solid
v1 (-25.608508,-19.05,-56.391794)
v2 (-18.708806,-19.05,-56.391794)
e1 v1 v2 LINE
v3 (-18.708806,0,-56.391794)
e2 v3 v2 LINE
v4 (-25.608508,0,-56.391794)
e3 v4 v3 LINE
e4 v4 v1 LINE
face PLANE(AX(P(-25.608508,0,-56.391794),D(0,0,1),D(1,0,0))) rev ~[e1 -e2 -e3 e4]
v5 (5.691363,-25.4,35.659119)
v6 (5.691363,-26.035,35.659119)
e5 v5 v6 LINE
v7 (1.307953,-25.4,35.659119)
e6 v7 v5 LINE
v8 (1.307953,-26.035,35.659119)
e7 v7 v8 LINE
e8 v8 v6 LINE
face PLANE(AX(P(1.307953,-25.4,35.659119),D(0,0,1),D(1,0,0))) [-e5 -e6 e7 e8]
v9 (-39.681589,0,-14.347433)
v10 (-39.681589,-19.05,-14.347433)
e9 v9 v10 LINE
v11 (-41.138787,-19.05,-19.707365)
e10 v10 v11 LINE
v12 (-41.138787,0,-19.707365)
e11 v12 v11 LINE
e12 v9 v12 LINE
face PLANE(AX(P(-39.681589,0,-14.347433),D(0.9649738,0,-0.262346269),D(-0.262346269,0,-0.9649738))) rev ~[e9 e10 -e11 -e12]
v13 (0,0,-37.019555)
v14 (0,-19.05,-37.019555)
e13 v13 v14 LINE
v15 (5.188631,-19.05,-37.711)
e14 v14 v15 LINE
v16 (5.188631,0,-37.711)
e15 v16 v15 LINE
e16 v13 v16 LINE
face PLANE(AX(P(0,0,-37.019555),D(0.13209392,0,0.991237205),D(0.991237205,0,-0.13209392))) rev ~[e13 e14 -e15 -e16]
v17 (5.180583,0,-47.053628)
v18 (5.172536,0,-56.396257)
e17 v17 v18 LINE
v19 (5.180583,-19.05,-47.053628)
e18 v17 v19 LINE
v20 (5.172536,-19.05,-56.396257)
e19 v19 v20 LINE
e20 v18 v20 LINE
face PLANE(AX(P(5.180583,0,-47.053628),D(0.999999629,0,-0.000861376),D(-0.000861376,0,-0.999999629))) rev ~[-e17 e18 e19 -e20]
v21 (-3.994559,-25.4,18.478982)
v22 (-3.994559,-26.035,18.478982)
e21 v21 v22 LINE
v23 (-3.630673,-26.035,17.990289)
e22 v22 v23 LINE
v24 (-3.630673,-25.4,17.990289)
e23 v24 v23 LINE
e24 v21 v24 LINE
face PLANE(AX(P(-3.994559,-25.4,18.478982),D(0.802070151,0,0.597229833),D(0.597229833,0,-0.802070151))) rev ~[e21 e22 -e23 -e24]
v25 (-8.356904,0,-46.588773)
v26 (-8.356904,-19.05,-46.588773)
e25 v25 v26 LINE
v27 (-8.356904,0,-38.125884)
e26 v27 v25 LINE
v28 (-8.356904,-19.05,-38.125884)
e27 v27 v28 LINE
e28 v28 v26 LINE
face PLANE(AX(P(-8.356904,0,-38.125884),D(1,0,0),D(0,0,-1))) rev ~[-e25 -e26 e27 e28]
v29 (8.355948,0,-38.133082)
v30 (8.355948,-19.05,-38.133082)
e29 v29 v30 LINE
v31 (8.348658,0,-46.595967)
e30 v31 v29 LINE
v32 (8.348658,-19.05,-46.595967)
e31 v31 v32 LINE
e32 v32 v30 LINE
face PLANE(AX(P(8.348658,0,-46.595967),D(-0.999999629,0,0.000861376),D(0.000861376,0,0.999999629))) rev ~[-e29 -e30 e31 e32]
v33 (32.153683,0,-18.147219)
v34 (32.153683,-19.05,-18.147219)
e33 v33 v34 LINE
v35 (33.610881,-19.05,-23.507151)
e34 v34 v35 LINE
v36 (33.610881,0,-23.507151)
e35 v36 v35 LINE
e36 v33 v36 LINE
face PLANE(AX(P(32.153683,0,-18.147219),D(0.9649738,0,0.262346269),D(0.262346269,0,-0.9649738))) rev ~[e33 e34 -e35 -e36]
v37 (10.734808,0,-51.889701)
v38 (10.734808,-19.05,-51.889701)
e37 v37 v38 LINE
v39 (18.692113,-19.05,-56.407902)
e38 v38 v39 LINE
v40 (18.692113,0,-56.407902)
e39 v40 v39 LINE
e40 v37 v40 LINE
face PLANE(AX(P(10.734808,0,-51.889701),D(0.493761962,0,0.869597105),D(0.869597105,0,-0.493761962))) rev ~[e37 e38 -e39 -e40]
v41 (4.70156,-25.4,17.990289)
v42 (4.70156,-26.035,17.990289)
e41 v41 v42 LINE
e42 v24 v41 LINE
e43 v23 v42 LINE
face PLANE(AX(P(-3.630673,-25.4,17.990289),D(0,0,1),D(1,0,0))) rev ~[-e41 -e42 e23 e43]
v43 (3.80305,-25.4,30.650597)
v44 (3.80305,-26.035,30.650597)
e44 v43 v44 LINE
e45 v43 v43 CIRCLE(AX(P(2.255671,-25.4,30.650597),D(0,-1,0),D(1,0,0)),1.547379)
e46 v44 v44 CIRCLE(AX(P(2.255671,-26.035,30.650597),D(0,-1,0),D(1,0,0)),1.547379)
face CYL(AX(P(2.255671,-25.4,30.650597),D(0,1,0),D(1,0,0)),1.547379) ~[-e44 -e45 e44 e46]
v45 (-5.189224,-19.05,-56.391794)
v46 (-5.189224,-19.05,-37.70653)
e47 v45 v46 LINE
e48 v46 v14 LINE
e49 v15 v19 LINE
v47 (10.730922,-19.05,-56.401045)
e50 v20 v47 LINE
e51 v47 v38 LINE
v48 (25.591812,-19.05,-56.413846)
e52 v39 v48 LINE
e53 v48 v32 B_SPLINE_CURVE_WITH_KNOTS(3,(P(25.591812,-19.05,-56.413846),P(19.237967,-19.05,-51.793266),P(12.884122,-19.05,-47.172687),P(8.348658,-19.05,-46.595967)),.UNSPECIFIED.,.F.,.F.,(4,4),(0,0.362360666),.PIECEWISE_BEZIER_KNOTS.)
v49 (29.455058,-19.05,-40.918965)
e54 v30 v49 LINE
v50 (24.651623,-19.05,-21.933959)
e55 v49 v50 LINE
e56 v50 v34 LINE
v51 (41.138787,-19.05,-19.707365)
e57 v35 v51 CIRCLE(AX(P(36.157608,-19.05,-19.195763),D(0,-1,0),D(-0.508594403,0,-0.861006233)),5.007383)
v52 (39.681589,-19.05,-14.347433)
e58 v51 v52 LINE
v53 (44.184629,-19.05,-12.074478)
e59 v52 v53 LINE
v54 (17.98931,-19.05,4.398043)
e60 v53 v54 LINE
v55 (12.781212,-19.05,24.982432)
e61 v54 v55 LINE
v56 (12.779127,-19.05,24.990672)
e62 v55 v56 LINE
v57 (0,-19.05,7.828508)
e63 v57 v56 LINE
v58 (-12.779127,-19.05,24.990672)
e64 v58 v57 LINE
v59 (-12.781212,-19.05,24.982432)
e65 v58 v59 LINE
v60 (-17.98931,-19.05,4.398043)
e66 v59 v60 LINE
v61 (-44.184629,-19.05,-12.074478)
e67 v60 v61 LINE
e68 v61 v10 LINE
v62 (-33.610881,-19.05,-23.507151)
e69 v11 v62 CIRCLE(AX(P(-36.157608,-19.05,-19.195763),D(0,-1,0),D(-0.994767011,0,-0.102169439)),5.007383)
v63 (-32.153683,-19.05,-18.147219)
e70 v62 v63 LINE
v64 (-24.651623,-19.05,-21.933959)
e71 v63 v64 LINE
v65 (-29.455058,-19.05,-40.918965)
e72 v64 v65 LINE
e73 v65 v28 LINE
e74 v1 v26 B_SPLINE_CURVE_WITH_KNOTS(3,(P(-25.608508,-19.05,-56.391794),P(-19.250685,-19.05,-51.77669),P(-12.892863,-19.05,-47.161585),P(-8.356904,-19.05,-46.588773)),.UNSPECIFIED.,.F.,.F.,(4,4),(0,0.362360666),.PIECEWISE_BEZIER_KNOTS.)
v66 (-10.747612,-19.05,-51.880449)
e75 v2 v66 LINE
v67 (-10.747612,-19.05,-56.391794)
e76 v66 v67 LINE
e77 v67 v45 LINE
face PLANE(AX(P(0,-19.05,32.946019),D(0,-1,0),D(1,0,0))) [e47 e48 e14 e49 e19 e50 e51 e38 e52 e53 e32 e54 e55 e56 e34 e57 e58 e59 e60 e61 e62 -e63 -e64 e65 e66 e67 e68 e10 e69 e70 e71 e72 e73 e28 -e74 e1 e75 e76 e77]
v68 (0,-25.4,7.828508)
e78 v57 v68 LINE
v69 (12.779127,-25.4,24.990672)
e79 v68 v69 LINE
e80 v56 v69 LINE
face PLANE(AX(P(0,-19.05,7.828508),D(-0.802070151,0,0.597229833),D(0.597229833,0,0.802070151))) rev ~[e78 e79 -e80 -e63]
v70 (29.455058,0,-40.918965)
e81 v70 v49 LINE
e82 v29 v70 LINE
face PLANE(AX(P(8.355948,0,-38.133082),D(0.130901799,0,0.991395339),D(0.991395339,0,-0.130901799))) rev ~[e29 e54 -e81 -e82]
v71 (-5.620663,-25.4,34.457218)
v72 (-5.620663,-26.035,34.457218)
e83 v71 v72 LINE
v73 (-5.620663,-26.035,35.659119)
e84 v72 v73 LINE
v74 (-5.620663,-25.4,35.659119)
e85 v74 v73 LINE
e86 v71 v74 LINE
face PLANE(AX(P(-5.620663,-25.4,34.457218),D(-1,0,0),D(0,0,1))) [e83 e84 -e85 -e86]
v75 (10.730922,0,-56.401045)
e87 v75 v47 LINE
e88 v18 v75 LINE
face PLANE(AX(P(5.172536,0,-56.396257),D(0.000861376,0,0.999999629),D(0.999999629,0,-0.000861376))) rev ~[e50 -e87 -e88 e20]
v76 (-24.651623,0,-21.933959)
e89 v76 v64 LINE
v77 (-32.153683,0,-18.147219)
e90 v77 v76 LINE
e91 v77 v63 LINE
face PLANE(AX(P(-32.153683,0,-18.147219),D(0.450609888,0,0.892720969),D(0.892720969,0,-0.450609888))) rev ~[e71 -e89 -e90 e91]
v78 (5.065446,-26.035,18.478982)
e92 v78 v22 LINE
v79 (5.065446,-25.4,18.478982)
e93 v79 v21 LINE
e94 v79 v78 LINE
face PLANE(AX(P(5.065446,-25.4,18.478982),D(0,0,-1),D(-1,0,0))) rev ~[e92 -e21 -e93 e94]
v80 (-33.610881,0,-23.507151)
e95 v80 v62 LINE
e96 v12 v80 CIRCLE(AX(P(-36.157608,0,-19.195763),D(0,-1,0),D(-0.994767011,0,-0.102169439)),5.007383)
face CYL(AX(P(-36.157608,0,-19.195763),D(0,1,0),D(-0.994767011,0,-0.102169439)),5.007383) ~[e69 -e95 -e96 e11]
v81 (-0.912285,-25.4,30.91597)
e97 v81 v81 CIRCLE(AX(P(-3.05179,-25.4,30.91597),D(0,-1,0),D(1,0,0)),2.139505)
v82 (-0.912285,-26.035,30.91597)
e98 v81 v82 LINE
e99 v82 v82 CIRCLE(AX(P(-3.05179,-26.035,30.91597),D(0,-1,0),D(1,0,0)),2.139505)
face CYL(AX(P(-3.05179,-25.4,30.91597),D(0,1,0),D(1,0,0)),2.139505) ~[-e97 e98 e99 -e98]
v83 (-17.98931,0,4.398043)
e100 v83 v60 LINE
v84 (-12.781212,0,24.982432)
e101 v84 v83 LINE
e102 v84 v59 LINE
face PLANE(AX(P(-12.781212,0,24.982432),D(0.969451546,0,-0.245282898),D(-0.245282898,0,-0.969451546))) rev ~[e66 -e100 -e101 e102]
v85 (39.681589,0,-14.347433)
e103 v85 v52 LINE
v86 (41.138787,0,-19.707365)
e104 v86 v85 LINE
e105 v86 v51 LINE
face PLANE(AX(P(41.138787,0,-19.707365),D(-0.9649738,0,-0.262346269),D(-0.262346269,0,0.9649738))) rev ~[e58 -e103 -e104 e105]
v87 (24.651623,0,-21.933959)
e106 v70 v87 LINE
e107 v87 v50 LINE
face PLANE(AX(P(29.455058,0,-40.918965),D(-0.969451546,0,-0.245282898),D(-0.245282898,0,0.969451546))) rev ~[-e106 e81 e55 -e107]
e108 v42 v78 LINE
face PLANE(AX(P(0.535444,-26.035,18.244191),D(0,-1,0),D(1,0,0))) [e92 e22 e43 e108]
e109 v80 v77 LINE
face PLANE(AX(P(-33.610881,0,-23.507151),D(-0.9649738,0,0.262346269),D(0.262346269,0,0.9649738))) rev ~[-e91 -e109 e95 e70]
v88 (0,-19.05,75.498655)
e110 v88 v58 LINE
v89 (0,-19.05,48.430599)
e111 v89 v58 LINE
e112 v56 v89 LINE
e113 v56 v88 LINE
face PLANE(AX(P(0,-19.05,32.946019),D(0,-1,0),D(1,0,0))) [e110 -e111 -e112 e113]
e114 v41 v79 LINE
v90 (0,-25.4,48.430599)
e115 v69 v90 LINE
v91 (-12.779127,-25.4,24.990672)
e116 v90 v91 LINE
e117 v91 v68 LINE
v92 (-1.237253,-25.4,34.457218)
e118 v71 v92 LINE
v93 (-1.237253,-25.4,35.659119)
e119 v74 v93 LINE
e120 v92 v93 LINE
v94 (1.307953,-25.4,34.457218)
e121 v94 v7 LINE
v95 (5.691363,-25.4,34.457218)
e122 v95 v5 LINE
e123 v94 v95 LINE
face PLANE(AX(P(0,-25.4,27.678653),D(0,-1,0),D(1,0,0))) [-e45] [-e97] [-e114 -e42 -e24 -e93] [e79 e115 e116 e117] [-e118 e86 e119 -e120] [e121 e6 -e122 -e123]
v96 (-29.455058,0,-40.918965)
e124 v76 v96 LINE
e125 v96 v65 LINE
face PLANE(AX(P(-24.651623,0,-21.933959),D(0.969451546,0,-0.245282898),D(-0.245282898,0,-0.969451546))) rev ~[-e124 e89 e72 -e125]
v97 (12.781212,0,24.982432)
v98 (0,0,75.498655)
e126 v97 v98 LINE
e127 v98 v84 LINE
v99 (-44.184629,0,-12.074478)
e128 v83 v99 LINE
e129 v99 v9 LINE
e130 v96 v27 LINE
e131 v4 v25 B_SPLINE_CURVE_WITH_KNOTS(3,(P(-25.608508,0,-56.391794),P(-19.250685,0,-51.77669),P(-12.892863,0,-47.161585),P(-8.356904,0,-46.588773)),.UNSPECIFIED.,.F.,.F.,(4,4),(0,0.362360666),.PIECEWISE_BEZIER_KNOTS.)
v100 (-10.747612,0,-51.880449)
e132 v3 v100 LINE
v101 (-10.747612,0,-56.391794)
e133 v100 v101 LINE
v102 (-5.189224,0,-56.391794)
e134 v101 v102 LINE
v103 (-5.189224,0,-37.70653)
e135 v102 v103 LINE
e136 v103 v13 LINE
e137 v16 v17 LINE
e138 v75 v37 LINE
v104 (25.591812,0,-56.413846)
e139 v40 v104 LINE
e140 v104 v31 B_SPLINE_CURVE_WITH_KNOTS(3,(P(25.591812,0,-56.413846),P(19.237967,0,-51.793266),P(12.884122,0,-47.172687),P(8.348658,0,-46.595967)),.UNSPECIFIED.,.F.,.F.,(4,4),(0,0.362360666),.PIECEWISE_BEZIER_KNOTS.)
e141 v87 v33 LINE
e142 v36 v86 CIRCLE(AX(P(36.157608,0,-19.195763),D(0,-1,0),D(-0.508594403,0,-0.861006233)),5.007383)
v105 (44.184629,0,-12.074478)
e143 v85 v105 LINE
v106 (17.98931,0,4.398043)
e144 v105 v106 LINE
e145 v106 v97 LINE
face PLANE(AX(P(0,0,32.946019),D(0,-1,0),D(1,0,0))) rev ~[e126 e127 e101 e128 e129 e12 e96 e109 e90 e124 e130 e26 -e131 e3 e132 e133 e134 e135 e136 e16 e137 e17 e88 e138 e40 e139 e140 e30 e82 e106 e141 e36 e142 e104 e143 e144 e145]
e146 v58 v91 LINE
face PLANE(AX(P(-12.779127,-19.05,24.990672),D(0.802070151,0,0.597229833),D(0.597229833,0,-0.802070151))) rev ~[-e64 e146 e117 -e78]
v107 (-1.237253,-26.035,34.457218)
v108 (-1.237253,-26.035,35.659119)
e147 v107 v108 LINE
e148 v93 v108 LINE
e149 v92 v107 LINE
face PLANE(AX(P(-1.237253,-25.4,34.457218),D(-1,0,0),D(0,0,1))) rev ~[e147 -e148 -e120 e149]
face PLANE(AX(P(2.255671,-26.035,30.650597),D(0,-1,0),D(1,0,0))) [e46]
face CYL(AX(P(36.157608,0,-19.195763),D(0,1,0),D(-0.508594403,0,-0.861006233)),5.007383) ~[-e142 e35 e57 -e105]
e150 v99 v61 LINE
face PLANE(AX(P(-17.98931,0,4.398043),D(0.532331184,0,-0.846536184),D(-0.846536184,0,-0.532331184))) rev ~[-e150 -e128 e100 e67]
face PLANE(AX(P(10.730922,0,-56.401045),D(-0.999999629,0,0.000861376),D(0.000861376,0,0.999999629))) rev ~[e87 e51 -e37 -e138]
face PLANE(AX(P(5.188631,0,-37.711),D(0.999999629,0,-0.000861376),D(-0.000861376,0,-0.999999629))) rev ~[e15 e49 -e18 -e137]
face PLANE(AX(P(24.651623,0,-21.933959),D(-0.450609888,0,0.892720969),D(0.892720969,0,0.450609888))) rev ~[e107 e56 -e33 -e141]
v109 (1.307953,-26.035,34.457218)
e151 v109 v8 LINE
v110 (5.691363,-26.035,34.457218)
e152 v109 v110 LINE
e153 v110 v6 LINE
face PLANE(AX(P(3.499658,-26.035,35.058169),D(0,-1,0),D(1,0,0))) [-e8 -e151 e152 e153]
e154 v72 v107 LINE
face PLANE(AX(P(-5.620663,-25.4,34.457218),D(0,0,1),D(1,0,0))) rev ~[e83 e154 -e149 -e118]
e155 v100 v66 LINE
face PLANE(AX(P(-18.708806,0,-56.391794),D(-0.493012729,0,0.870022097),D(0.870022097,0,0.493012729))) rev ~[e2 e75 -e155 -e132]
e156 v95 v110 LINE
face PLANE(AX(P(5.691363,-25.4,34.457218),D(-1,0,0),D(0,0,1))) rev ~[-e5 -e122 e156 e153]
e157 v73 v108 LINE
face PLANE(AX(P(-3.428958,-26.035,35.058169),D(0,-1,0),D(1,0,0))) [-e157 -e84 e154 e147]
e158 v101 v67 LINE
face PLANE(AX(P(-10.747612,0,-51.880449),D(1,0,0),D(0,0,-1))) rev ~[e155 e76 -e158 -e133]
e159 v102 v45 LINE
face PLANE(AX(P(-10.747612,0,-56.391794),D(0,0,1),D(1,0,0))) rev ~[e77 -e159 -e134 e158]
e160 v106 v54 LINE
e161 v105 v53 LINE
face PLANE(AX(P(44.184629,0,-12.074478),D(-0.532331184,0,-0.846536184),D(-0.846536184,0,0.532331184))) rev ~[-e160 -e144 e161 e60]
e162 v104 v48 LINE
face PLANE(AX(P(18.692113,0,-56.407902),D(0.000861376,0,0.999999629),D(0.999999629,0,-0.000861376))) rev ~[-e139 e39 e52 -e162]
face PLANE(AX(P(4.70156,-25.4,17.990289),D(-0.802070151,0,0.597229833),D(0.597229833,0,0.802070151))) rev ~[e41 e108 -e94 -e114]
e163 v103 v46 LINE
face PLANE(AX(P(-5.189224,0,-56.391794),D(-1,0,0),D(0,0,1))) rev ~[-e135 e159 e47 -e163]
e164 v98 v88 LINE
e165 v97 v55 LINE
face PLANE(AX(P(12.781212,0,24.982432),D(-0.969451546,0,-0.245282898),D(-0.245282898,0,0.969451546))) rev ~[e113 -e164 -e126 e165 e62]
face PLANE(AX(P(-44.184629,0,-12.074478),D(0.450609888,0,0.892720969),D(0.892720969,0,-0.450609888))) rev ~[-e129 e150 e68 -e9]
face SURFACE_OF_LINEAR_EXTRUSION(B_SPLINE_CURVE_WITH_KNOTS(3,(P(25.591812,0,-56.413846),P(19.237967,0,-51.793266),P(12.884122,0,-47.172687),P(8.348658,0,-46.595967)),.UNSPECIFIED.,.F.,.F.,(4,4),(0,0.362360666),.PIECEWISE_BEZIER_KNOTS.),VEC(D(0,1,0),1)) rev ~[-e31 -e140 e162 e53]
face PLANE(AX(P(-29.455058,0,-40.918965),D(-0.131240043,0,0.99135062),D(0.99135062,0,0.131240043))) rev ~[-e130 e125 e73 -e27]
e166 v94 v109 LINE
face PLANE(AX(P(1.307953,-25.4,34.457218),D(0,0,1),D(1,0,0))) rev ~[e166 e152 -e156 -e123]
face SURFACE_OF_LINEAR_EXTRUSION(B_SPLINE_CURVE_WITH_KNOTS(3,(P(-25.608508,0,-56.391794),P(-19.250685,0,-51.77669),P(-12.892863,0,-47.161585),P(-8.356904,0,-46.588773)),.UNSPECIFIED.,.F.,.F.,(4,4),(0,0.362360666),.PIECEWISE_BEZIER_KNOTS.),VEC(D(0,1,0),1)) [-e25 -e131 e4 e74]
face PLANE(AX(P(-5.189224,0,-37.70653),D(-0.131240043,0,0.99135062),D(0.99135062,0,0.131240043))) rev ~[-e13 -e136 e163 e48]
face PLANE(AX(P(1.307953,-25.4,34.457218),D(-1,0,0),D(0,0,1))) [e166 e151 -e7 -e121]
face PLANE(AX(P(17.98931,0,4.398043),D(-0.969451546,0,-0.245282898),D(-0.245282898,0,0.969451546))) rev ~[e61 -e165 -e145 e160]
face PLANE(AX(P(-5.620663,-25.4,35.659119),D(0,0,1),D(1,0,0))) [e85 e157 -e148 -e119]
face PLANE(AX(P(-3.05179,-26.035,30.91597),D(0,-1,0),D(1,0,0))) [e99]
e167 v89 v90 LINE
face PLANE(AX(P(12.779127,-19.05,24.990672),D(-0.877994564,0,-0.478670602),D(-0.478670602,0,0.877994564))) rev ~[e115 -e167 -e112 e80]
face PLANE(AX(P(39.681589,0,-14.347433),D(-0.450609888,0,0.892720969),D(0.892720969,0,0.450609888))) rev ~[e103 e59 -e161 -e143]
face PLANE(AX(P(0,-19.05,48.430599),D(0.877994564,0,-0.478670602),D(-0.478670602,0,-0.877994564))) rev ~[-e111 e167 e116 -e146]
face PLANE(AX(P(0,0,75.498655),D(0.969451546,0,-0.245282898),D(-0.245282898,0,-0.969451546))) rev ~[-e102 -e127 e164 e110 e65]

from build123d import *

# Parameters (mm, degrees)
F1_DEPTH = 19.05
F3_DEPTH = 6.35
F4_R     = 2.1395052033
F4_R_2   = 1.5473789097
F4_W     = 4.3834099779
F4_H     = 1.2019015849
F5_DEPTH = 0.635


with BuildPart() as f1:
    # F0 (on Front) → F1 (new body)
    with BuildSketch(Plane.XZ):
        Polygon((12.7812118899, 24.9824322697), (0, 75.4986554384), (-12.7812118899, 24.9824322697), (-17.9893098468, 4.3980431727), (17.9893098468, 4.3980431727), align=None)
        with BuildLine():
            Line((17.9893098468, 4.3980431727), (-17.9893098468, 4.3980431727))
            Line((-17.9893098468, 4.3980431727), (-44.1846288741, -12.0744779706))
            Line((-44.1846288741, -12.0744779706), (-39.6815885197, -14.3474328787))
            Line((-39.6815885197, -14.3474328787), (-41.1387868226, -19.7073649615))
            ThreePointArc((-41.1387868226, -19.7073649615), (-38.4139838362, -23.6659590485), (-33.6108808251, -23.5071512254))
            Line((-33.6108808251, -23.5071512254), (-32.1536825222, -18.1472191426))
            Line((-32.1536825222, -18.1472191426), (-24.6516230519, -21.933959112))
            Line((-24.6516230519, -21.933959112), (-29.4550578464, -40.9189650839))
            Line((-29.4550578464, -40.9189650839), (-8.3569039417, -38.1258840272))
            Line((-8.3569039417, -38.1258840272), (-8.3569039417, -46.5887725028))
            add(Edge.make_bspline(
                [(-8.3569039417, -46.5887725028), (-7.1639467181, -46.4381227358), (-6.0970060344, -46.567074298), (-5.1892242436, -47.0491623459)],
                knots=[0.3623606656, 0.3623606656, 0.3623606656, 0.3623606656, 0.4576615295, 0.4576615295, 0.4576615295, 0.4576615295], degree=3))
            Line((-5.1892242436, -47.0491623459), (-5.1892242436, -37.7065304572))
            Line((-5.1892242436, -37.7065304572), (0, -37.0195545256))
            Line((0, -37.0195545256), (5.1886305738, -37.7110000757))
            Line((5.1886305738, -37.7110000757), (5.1805830548, -47.0536284984))
            add(Edge.make_bspline(
                [(8.3486581466, -46.5959673895), (7.1558311316, -46.4442900935), (6.0887797679, -46.5723225708), (5.1805830548, -47.0536284984)],
                knots=[0.3623606656, 0.3623606656, 0.3623606656, 0.3623606656, 0.4576615295, 0.4576615295, 0.4576615295, 0.4576615295], degree=3))
            Line((8.3486581466, -46.5959673895), (8.3559478758, -38.1330820534))
            Line((8.3559478758, -38.1330820534), (29.4550578464, -40.9189650839))
            Line((29.4550578464, -40.9189650839), (24.6516230519, -21.933959112))
            Line((24.6516230519, -21.933959112), (32.1536825222, -18.1472191426))
            Line((32.1536825222, -18.1472191426), (33.6108808251, -23.5071512254))
            ThreePointArc((33.6108808251, -23.5071512254), (38.4139838362, -23.6659590485), (41.1387868226, -19.7073649615))
            Line((41.1387868226, -19.7073649615), (39.6815885197, -14.3474328787))
            Line((39.6815885197, -14.3474328787), (44.1846288741, -12.0744779706))
            Line((44.1846288741, -12.0744779706), (17.9893098468, 4.3980431727))
        make_face()
        with BuildLine():
            add(Edge.make_bspline(
                [(-8.3569039417, -46.5887725028), (-7.1639467181, -46.4381227358), (-6.0970060344, -46.567074298), (-5.1892242436, -47.0491623459)],
                knots=[0.3623606656, 0.3623606656, 0.3623606656, 0.3623606656, 0.4576615295, 0.4576615295, 0.4576615295, 0.4576615295], degree=3))
            add(Edge.make_bspline(
                [(-25.6085079163, -56.3917942345), (-19.2506852316, -51.7766897434), (-12.8928625468, -47.1615852522), (-8.3569039417, -46.5887725028)],
                knots=[0, 0, 0, 0, 0.3623606656, 0.3623606656, 0.3623606656, 0.3623606656], degree=3))
            Line((-25.6085079163, -56.3917942345), (-18.7088064849, -56.3917942345))
            Line((-18.7088064849, -56.3917942345), (-10.747612454, -51.8804490566))
            Line((-10.747612454, -51.8804490566), (-10.747612454, -56.3917942345))
            Line((-10.747612454, -56.3917942345), (-5.1892242436, -56.3917942345))
            Line((-5.1892242436, -56.3917942345), (-5.1892242436, -47.0491623459))
        make_face()
        with BuildLine():
            add(Edge.make_bspline(
                [(25.5918116332, -56.4138456024), (19.2379666475, -51.7932663474), (12.8841216618, -47.1726870923), (8.3486581466, -46.5959673895)],
                knots=[0, 0, 0, 0, 0.3623606656, 0.3623606656, 0.3623606656, 0.3623606656], degree=3))
            add(Edge.make_bspline(
                [(8.3486581466, -46.5959673895), (7.1558311316, -46.4442900935), (6.0887797679, -46.5723225708), (5.1805830548, -47.0536284984)],
                knots=[0.3623606656, 0.3623606656, 0.3623606656, 0.3623606656, 0.4576615295, 0.4576615295, 0.4576615295, 0.4576615295], degree=3))
            Line((5.1805830548, -47.0536284984), (5.1725355357, -56.396256921))
            Line((5.1725355357, -56.396256921), (10.730921684, -56.4010447834))
            Line((10.730921684, -56.4010447834), (10.7348076486, -51.8897012791))
            Line((10.7348076486, -51.8897012791), (18.6921127615, -56.407902365))
            Line((18.6921127615, -56.407902365), (25.5918116332, -56.4138456024))
        make_face()
    extrude(amount=F1_DEPTH)

    # F2 (on face) → F3 (join)
    with BuildSketch(Plane.XZ.offset(19.05)):
        Polygon((12.7791271915, 24.9906717928), (0, 48.4305992723), (-12.7791271915, 24.9906717928), (0, 7.8285075724), align=None)
    extrude(amount=F3_DEPTH)

    # F4 (on face) → F5 (join)
    with BuildSketch(Plane.XZ.offset(25.4)):
        with Locations((-3.0517904088, 30.9159699827)):
            Circle(F4_R)
        with Locations((2.2556707263, 30.6505970657)):
            Circle(F4_R_2)
        Polygon((5.0654464612, 18.4789821506), (-3.9945594035, 18.4789821506), (-3.6306733055, 17.9902889184), (4.7015603632, 17.9902889184), align=None)
        with Locations((-3.4289575997, 35.0581686944)):
            Rectangle(F4_W, F4_H)
        with Locations((3.4996584873, 35.0581686944)):
            Rectangle(F4_W, F4_H)
    extrude(amount=F5_DEPTH)


solid = f1.part
